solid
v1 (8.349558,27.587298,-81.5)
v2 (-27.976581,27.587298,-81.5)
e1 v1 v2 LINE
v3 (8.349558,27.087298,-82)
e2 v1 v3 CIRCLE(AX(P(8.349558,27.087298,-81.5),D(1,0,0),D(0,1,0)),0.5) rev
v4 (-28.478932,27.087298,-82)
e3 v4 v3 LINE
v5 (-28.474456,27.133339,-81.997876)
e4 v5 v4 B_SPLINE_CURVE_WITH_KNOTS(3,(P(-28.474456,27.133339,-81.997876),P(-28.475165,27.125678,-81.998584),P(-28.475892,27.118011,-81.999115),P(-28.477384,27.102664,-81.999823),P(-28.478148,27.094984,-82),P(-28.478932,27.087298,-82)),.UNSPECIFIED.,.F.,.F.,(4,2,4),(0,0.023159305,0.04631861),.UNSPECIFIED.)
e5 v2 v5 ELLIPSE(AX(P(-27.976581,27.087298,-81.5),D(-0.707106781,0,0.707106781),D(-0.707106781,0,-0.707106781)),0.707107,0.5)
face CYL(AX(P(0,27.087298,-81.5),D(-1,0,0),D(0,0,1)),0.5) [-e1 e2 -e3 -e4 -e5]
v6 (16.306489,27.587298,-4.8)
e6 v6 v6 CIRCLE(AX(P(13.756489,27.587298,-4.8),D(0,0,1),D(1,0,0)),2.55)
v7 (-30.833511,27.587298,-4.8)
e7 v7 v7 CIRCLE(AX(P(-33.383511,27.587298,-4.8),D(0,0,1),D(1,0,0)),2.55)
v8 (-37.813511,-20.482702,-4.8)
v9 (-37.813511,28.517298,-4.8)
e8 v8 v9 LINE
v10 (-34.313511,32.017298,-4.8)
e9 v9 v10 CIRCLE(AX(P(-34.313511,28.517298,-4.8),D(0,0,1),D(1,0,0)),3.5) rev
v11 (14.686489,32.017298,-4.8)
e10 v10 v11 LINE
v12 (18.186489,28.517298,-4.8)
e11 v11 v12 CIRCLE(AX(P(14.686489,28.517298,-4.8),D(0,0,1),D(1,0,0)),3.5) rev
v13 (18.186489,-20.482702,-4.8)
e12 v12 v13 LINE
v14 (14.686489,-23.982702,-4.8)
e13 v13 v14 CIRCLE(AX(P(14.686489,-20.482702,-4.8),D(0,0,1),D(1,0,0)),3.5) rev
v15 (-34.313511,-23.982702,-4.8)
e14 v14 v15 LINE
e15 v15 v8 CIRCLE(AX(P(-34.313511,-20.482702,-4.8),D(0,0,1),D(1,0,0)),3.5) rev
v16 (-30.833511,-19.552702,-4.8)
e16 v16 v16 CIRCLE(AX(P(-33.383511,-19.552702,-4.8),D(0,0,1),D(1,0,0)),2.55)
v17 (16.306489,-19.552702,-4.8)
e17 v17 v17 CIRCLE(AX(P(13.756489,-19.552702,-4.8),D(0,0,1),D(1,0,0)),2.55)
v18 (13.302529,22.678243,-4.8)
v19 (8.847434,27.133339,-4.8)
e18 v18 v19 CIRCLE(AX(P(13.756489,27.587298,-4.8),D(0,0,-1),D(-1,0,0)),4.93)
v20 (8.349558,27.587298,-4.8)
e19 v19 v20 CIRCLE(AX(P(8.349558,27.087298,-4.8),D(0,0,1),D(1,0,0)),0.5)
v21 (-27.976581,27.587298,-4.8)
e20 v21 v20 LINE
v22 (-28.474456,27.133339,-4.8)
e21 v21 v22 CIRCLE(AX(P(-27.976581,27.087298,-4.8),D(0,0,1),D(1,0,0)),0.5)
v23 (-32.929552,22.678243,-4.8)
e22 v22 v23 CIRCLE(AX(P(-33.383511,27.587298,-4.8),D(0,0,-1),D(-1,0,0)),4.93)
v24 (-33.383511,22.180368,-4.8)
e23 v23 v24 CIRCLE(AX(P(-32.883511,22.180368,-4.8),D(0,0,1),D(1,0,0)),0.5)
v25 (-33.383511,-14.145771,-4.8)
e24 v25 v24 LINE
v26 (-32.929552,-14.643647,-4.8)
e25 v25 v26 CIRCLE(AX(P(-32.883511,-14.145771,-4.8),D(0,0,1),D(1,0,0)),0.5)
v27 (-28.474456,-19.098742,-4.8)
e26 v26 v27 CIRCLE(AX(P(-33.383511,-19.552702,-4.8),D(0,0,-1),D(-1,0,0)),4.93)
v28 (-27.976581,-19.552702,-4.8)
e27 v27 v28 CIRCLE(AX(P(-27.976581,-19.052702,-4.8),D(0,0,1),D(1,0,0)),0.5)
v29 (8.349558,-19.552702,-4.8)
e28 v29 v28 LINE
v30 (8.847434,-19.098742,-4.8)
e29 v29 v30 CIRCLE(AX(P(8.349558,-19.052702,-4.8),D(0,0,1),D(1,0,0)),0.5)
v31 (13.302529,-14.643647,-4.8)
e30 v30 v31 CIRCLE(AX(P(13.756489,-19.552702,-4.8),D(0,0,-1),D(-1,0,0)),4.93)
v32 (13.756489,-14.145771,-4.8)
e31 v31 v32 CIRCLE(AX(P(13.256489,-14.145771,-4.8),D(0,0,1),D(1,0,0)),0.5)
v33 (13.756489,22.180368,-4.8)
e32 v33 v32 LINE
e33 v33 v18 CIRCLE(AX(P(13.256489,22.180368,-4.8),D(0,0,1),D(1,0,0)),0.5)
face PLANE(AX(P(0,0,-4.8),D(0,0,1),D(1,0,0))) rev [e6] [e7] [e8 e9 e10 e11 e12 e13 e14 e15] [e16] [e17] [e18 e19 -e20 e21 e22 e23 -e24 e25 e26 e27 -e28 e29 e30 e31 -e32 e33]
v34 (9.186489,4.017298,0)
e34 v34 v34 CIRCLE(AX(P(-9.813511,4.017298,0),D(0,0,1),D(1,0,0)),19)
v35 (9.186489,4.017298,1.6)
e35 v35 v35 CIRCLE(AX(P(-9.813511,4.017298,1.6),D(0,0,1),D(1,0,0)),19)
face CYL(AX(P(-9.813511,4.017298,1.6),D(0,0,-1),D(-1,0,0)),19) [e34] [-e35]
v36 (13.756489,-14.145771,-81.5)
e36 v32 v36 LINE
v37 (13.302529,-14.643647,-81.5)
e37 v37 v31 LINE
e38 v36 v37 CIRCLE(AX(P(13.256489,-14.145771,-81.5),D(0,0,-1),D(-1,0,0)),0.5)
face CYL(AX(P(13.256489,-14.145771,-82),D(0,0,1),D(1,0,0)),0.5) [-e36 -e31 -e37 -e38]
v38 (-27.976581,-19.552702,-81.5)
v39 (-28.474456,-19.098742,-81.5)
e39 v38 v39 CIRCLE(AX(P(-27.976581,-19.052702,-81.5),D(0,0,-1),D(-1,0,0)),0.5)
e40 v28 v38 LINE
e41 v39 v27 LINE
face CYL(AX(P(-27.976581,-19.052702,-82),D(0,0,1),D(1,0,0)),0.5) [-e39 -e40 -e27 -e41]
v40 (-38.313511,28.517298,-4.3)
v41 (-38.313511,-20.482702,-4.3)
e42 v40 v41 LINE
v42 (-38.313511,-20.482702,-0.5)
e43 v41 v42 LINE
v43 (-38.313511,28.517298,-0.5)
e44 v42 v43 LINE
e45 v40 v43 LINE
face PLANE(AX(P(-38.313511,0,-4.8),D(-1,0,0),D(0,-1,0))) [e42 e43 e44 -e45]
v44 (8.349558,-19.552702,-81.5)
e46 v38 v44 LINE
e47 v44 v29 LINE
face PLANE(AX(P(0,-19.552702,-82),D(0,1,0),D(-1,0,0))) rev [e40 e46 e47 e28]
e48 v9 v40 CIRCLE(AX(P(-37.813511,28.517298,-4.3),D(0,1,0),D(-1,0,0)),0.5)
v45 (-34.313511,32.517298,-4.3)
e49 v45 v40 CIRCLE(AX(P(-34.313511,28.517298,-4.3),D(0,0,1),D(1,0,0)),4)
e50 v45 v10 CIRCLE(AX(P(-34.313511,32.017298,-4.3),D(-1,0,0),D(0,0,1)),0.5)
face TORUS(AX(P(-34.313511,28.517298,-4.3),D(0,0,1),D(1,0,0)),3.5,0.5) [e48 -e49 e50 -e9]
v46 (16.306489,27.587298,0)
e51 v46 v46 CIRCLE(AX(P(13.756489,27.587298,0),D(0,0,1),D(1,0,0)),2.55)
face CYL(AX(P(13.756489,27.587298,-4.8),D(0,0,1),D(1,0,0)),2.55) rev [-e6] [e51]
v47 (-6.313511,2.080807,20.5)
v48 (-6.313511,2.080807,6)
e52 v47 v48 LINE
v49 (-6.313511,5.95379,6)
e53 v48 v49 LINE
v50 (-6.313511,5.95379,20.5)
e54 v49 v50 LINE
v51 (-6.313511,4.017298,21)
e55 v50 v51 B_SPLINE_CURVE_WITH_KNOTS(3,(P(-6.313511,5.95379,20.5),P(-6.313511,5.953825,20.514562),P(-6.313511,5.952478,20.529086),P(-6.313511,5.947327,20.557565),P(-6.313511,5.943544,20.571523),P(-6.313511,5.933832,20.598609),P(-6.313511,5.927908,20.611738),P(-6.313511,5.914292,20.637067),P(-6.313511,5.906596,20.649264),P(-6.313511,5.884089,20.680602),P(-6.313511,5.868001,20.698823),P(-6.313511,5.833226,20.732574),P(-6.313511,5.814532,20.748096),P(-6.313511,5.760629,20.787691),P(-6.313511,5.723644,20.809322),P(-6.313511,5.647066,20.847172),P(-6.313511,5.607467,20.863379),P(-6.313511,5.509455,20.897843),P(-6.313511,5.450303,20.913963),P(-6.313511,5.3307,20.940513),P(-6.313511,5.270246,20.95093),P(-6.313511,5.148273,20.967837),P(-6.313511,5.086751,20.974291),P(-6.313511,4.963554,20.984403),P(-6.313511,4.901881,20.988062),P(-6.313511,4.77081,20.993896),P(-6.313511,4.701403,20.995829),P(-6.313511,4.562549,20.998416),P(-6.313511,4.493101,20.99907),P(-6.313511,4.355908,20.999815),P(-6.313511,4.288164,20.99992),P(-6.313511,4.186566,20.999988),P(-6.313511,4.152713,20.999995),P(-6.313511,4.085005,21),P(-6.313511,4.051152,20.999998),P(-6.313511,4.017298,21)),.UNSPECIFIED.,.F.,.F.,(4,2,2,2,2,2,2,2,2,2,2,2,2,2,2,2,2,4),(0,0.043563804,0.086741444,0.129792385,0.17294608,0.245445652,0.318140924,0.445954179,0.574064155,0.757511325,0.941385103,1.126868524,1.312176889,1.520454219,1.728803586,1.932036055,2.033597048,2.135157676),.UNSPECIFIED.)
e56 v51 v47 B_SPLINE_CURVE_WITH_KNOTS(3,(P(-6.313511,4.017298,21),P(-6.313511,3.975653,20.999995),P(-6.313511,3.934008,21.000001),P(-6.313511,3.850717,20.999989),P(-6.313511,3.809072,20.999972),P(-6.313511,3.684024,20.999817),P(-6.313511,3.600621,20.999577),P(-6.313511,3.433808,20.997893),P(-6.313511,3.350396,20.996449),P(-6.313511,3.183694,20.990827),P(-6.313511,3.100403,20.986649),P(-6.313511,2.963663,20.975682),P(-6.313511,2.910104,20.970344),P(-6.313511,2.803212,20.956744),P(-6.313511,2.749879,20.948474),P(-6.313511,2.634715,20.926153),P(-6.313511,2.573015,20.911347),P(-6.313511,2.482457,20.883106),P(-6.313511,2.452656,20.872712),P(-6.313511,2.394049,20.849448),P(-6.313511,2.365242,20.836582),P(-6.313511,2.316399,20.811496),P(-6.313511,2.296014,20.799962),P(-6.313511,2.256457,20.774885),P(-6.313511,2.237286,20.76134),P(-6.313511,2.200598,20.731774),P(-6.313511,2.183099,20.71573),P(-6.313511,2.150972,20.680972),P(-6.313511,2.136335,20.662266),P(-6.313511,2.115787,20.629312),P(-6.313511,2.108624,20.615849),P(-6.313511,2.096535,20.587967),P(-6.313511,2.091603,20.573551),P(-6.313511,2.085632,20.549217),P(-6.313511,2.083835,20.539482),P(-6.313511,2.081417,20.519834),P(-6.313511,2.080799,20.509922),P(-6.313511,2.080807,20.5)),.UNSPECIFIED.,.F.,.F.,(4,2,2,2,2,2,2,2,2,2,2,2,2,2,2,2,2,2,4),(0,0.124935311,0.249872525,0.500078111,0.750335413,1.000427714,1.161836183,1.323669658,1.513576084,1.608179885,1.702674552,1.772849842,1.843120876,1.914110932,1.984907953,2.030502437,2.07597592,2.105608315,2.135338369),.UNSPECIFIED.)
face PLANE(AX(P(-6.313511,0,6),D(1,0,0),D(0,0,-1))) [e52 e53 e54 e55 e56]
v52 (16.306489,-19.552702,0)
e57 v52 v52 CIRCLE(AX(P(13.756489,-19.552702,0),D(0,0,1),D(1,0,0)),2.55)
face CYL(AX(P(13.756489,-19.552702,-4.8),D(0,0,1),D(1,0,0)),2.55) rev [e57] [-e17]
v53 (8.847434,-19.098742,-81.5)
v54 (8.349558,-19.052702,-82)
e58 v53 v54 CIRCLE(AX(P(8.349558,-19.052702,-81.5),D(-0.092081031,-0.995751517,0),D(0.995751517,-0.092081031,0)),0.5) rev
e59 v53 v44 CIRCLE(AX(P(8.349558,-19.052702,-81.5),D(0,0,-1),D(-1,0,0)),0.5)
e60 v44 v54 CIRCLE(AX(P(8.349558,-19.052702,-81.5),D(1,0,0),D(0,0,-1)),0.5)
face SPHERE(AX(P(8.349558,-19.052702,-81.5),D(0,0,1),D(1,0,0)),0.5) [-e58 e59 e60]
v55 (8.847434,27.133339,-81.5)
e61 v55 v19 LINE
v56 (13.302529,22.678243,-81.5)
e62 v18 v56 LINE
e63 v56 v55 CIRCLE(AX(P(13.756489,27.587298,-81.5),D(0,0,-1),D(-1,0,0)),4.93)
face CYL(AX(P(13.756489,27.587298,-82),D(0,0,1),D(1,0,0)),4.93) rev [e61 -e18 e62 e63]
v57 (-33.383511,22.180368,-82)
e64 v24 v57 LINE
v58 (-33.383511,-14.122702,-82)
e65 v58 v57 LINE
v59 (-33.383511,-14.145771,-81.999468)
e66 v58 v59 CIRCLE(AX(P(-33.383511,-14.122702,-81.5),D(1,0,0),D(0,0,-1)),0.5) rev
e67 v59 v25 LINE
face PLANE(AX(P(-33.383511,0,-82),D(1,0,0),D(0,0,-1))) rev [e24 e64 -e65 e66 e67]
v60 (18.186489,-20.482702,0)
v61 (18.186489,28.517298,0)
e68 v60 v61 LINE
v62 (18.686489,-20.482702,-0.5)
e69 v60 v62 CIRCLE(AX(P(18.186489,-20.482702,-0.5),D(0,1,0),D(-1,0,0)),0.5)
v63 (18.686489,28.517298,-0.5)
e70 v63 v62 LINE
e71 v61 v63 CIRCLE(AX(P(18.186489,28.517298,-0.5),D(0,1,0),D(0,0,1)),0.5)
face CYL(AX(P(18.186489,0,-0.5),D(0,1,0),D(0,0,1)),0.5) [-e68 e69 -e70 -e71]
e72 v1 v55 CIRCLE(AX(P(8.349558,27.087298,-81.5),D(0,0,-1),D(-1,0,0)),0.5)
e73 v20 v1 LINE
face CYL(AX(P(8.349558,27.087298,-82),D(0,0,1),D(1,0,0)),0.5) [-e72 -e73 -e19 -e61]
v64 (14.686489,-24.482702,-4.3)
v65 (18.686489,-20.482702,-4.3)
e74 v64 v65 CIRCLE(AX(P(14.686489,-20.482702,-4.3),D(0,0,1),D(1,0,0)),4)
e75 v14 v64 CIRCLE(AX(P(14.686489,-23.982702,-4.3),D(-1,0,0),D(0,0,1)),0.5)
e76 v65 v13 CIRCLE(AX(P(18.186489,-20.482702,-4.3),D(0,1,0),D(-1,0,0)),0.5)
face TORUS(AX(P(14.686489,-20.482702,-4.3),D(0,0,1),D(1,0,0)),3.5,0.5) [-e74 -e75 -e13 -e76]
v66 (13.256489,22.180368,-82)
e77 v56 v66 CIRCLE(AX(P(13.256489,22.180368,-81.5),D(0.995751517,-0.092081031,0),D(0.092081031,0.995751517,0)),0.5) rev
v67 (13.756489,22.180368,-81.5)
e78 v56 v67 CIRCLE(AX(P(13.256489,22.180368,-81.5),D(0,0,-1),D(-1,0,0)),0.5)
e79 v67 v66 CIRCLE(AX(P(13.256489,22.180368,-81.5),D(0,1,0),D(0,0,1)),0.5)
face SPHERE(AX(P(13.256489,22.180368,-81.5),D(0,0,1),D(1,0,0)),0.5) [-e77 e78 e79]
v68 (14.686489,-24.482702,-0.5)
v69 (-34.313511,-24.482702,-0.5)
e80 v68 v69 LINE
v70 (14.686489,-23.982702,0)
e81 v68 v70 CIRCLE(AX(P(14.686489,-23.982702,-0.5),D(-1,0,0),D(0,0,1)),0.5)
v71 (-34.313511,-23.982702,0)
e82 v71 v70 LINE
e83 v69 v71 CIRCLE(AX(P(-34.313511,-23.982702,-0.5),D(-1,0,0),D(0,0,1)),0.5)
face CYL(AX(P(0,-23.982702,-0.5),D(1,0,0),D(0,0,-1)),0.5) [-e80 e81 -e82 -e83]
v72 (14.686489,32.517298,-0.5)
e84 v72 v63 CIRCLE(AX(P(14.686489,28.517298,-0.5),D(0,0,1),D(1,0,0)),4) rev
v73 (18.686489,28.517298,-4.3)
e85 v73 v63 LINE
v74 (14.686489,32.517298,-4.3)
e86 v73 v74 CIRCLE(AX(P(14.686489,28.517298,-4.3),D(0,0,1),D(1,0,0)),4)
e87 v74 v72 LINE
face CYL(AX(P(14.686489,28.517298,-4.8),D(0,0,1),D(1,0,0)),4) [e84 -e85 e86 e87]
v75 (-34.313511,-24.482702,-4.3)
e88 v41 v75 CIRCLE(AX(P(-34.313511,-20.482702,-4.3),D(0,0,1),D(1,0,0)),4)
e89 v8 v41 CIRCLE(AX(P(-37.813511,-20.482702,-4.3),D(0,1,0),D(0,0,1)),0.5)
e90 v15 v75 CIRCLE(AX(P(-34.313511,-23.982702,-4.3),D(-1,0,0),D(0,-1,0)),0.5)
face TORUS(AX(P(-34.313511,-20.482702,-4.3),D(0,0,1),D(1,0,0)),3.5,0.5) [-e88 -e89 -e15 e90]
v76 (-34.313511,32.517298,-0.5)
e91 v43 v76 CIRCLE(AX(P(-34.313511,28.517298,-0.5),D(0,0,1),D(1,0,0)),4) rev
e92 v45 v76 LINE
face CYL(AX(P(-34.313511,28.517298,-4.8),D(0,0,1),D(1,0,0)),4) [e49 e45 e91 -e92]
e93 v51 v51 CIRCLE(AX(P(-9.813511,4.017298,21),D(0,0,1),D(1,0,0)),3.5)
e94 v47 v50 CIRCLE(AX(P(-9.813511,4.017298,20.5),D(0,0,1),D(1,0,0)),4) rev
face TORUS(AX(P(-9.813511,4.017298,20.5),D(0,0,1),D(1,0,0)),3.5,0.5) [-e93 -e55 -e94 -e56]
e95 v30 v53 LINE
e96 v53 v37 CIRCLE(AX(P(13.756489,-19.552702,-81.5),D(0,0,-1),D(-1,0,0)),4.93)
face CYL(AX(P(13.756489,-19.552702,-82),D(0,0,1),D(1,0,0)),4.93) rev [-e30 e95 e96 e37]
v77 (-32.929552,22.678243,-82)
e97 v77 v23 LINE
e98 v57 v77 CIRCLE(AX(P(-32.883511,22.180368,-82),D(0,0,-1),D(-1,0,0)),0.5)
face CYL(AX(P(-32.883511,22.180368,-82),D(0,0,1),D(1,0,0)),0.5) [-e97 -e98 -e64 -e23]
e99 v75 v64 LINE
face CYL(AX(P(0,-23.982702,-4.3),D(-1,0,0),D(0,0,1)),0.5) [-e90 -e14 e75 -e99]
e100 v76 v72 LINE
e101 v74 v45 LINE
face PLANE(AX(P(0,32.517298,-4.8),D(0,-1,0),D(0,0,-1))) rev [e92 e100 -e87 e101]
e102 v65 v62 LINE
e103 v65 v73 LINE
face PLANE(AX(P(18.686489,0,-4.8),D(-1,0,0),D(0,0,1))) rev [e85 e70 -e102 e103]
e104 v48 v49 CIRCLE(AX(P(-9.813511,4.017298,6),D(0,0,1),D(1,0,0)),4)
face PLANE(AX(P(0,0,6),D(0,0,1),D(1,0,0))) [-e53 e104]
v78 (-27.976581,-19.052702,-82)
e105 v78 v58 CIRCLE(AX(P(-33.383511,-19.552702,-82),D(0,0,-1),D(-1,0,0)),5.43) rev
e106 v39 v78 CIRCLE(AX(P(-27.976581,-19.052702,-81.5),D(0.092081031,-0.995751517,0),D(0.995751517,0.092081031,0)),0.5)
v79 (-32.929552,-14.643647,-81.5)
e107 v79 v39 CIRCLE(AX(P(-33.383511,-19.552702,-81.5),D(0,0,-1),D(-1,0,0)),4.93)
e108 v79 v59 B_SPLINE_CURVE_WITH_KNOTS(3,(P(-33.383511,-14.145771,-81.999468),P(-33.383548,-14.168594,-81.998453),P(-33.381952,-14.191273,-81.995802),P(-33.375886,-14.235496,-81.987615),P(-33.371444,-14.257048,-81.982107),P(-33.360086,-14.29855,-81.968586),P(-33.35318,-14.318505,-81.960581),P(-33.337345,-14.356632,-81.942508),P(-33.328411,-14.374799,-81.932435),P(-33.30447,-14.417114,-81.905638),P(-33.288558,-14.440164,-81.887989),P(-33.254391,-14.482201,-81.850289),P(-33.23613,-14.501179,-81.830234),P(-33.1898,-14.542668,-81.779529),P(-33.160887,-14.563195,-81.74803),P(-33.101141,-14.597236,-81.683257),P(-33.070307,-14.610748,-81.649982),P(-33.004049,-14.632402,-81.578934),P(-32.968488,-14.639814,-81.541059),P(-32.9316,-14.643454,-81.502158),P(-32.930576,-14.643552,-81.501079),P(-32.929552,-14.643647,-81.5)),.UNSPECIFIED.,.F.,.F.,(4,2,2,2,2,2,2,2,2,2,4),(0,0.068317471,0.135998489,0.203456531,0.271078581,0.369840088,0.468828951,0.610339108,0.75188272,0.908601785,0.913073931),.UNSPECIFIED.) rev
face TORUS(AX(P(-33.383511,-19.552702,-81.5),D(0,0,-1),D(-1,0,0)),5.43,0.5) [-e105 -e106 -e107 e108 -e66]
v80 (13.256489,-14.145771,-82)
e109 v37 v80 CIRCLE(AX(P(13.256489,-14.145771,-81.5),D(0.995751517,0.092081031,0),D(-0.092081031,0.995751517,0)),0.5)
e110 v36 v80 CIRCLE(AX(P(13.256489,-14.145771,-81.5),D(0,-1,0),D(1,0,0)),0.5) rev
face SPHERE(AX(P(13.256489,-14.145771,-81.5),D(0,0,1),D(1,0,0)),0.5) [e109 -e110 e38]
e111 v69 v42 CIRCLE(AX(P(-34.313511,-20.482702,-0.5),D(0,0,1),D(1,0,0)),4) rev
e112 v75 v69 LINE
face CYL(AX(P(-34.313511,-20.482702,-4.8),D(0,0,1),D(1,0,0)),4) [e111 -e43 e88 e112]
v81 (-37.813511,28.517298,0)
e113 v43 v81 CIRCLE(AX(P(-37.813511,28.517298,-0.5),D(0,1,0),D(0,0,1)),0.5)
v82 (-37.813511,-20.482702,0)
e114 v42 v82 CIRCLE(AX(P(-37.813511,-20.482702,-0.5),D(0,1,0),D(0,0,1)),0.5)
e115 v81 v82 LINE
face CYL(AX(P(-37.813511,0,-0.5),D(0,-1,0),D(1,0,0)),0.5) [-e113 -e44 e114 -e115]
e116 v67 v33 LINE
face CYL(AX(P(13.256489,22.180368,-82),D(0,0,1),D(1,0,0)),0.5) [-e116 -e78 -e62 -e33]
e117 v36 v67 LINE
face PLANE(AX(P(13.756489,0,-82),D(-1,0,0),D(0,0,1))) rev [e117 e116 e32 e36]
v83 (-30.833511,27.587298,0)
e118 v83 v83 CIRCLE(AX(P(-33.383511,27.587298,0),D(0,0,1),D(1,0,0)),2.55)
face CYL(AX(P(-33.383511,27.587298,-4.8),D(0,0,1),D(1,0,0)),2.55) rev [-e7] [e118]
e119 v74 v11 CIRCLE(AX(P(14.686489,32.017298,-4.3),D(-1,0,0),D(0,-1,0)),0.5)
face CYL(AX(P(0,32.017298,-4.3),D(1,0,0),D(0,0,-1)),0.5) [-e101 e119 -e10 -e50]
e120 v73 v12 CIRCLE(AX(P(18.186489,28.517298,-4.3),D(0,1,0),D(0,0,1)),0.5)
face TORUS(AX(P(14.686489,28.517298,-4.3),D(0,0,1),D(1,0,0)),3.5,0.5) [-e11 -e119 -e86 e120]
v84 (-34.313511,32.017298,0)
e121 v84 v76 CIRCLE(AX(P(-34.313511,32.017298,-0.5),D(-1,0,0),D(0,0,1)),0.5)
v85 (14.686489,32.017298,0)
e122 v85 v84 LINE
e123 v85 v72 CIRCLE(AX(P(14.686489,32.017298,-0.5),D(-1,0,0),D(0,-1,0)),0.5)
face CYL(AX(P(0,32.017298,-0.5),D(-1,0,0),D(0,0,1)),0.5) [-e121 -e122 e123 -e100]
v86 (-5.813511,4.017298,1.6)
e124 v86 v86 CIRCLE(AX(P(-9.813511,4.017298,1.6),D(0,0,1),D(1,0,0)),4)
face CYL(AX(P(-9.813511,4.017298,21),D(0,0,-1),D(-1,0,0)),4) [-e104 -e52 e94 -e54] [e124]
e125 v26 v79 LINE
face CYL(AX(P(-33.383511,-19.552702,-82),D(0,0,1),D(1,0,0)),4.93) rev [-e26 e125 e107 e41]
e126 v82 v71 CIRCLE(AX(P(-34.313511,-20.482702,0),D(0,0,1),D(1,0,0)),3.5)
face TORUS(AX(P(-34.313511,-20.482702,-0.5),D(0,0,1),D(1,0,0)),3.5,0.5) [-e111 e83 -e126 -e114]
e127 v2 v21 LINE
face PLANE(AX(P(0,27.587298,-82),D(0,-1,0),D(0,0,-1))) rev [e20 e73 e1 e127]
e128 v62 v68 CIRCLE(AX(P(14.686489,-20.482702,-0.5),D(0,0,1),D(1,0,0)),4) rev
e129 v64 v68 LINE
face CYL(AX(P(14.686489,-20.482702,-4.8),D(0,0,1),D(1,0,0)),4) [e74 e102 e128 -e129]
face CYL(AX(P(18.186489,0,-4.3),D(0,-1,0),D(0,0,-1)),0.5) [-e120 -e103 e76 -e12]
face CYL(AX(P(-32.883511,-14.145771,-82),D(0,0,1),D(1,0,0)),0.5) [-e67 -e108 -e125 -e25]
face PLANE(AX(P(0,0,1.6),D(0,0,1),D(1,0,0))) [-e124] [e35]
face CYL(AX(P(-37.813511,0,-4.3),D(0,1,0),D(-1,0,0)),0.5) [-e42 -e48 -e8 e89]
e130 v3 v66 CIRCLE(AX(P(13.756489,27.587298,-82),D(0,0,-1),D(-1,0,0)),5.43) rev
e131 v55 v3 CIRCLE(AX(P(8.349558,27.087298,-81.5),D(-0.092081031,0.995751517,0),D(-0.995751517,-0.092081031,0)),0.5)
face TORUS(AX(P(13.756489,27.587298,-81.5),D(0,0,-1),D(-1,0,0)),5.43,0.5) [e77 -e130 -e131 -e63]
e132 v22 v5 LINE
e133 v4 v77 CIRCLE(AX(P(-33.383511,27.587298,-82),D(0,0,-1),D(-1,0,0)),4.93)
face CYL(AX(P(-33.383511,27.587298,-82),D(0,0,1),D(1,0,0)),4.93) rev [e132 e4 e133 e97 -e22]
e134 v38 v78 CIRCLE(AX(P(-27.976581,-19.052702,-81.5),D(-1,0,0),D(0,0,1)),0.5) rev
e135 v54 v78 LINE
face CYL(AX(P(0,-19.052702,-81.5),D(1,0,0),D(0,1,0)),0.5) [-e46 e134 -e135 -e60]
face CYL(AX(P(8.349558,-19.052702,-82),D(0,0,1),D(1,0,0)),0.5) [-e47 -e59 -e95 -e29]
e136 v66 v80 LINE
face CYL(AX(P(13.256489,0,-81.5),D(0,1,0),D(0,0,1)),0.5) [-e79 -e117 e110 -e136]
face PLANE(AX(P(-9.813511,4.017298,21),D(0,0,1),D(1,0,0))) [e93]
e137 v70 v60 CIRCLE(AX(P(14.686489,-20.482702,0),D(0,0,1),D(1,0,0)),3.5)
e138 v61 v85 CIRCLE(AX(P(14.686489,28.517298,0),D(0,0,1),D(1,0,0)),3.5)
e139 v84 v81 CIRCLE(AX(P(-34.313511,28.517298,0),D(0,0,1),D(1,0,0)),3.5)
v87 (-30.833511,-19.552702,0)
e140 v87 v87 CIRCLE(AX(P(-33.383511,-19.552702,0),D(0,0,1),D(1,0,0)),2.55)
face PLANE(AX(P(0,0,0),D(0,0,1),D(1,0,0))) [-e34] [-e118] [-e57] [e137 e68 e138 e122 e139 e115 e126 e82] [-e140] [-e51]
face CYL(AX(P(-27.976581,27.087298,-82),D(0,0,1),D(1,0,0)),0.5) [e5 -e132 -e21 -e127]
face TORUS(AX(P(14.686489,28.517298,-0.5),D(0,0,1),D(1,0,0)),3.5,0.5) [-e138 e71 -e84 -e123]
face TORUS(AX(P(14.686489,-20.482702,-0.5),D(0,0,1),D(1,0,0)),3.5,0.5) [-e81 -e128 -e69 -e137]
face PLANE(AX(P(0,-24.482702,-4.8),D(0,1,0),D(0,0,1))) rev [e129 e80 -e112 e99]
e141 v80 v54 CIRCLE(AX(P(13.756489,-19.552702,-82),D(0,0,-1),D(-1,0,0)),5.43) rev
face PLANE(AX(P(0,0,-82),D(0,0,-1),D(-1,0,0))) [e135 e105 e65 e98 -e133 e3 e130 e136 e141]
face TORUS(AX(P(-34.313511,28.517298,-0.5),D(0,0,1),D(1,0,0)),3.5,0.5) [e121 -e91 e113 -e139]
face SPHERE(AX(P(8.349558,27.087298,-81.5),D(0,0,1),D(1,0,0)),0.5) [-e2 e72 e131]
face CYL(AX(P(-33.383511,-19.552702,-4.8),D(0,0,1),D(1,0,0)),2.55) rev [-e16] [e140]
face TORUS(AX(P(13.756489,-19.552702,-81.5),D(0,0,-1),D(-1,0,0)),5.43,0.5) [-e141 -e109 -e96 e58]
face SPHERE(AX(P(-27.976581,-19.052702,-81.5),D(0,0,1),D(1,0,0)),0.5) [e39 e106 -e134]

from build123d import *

# Parameters (mm, degrees)
IZIM1_R                     = 19.05
IZIM1_R_2                   = 2.55
IZIM1_R_3                   = 4
Y_KSEKLIK_EKSTR_ZYON1_DEPTH = 4.8
Y_KSEKLIK_EKSTR_ZYON2_DEPTH = 1.6
IZIM3_R                     = 4
Y_KSEKLIK_EKSTR_ZYON3_DEPTH = 19.4
KES_EKSTR_ZYON1_DEPTH       = 15
Y_KSEKLIK_EKSTR_ZYON4_DEPTH = 77.2
RADYUS1_R                   = 0.5


with BuildPart() as part:
    # Çizim1 → Yükseklik-Ekstrüzyon1 (new body)
    # profile 1 of 3: a face of its own
    with BuildSketch(Plane.XY):
        with BuildLine():
            Line((-34.313511383, 32.517298381), (14.686488617, 32.517298381))
            ThreePointArc((14.686488617, 32.517298381), (17.514915741, 31.345725506), (18.686488617, 28.517298381))
            Line((18.686488617, 28.517298381), (18.686488617, -20.482701619))
            ThreePointArc((18.686488617, -20.482701619), (17.514915741, -23.311128744), (14.686488617, -24.482701619))
            Line((14.686488617, -24.482701619), (-34.313511383, -24.482701619))
            ThreePointArc((-34.313511383, -24.482701619), (-37.141938508, -23.311128744), (-38.313511383, -20.482701619))
            Line((-38.313511383, -20.482701619), (-38.313511383, 28.517298381))
            ThreePointArc((-38.313511383, 28.517298381), (-37.141938508, 31.345725506), (-34.313511383, 32.517298381))
        make_face()
        with Locations((-9.813511383, 4.017298381)):
            Circle(IZIM1_R, mode=Mode.SUBTRACT)
        with Locations((13.756488617, 27.587298381)):
            Circle(IZIM1_R_2, mode=Mode.SUBTRACT)
        with Locations((13.756488617, -19.552701619)):
            Circle(IZIM1_R_2, mode=Mode.SUBTRACT)
        with Locations((-33.383511383, -19.552701619)):
            Circle(IZIM1_R_2, mode=Mode.SUBTRACT)
        with Locations((-33.383511383, 27.587298381)):
            Circle(IZIM1_R_2, mode=Mode.SUBTRACT)
    # profile 2 of 3: a face of its own
    with BuildSketch(Plane.XY):
        with Locations((-9.813511383, 4.017298381)):
            Circle(IZIM1_R)
        with Locations((-9.813511383, 4.017298381)):
            Circle(IZIM1_R_3, mode=Mode.SUBTRACT)
    # profile 3 of 3: a face of its own
    with BuildSketch(Plane.XY):
        with Locations((-9.813511383, 4.017298381)):
            Circle(IZIM1_R_3)
    extrude(amount=-Y_KSEKLIK_EKSTR_ZYON1_DEPTH)

    # Çizim2 → Yükseklik-Ekstrüzyon2 (add)
    with BuildSketch(Plane.XY):
        with BuildLine():
            ThreePointArc((9.186488617, 4.017298381), (3.621517459, 17.452327223), (-9.813511383, 23.017298381))
            Line((-9.813511383, 23.017298381), (-9.813511383, -14.982701619))
            ThreePointArc((-9.813511383, -14.982701619), (3.621517459, -9.417730462), (9.186488617, 4.017298381))
        make_face()
        with BuildLine():
            Line((-9.813511383, -14.982701619), (-9.813511383, 23.017298381))
            ThreePointArc((-9.813511383, 23.017298381), (-28.813511383, 4.017298381), (-9.813511383, -14.982701619))
        make_face()
    extrude(amount=Y_KSEKLIK_EKSTR_ZYON2_DEPTH)

    # Çizim3 → Yükseklik-Ekstrüzyon3 (add)
    with BuildSketch(Plane.XY.offset(1.6)):
        with Locations((-9.813511383, 4.017298381)):
            Circle(IZIM3_R)
    extrude(amount=Y_KSEKLIK_EKSTR_ZYON3_DEPTH)

    # Çizim4 → Kes-Ekstrüzyon1 (cut)
    with BuildSketch(Plane.XY.offset(21)):
        Polygon((-6.313511383, 4.017298381), (-6.313511383, 6.245974497), (-5.024546615, 6.245974497), (-5.024546615, 1.577201368), (-6.313511383, 1.577201368), align=None)
    extrude(amount=-KES_EKSTR_ZYON1_DEPTH, mode=Mode.SUBTRACT)

    # Çizim5 → Yükseklik-Ekstrüzyon4 (add)
    with BuildSketch(Plane(origin=(0, 0, -4.8), x_dir=(-1, 0, 0), z_dir=(0, 0, -1))):
        with BuildLine():
            ThreePointArc((-8.826488617, 27.587298381), (-10.270452185, 24.10126195), (-13.756488617, 22.657298381))
            Line((-13.756488617, 22.657298381), (-13.756488617, -14.622701619))
            ThreePointArc((-13.756488617, -14.622701619), (-10.270452185, -16.066665188), (-8.826488617, -19.552701619))
            Line((-8.826488617, -19.552701619), (28.453511383, -19.552701619))
            ThreePointArc((28.453511383, -19.552701619), (29.897474952, -16.066665188), (33.383511383, -14.622701619))
            Line((33.383511383, -14.622701619), (33.383511383, 22.657298381))
            ThreePointArc((33.383511383, 22.657298381), (29.897474952, 24.10126195), (28.453511383, 27.587298381))
            Line((28.453511383, 27.587298381), (-8.826488617, 27.587298381))
        make_face()
    extrude(amount=Y_KSEKLIK_EKSTR_ZYON4_DEPTH)

    # Radyus1
    radyus1_edges = [part.edges().sort_by_distance(p)[0] for p in [
        (-37.141938508, 31.345725506, -4.8),
        (-38.313511383, 4.017298381, -4.8),
        (-37.141938508, -23.311128744, -4.8),
        (-9.813511383, -24.482701619, -4.8),
        (17.514915741, -23.311128744, -4.8),
        (18.686488617, 4.017298381, -4.8),
        (17.514915741, 31.345725506, -4.8),
        (-37.141938508, 31.345725506, 0),
        (-38.313511383, 4.017298381, 0),
        (-37.141938508, -23.311128744, 0),
        (-9.813511383, -24.482701619, 0),
        (17.514915741, -23.311128744, 0),
        (18.686488617, 4.017298381, 0),
        (17.514915741, 31.345725506, 0),
        (-28.453511383, 27.587298381, -43.4),
        (-33.383511383, 22.657298381, -43.4),
        (-33.383511383, -14.622701619, -43.4),
        (-29.897474952, -16.066665188, -82),
        (-28.453511383, -19.552701619, -43.4),
        (-9.813511383, -19.552701619, -82),
        (10.270452185, -16.066665188, -82),
        (8.826488617, -19.552701619, -43.4),
        (13.756488617, -14.622701619, -43.4),
        (-9.813511383, 27.587298381, -82),
        (8.826488617, 27.587298381, -43.4),
        (10.270452185, 24.10126195, -82),
        (13.756488617, 22.657298381, -43.4),
        (13.756488617, 4.017298381, -82),
        (-13.813511383, 4.017298381, 21),
        (-9.813511383, 32.517298381, -4.8),
        (-9.813511383, 32.517298381, 0),
    ]]
    fillet(radyus1_edges, radius=RADYUS1_R - 0.0001)  # a hair under: the kernel refuses the full size


solid = part.part
